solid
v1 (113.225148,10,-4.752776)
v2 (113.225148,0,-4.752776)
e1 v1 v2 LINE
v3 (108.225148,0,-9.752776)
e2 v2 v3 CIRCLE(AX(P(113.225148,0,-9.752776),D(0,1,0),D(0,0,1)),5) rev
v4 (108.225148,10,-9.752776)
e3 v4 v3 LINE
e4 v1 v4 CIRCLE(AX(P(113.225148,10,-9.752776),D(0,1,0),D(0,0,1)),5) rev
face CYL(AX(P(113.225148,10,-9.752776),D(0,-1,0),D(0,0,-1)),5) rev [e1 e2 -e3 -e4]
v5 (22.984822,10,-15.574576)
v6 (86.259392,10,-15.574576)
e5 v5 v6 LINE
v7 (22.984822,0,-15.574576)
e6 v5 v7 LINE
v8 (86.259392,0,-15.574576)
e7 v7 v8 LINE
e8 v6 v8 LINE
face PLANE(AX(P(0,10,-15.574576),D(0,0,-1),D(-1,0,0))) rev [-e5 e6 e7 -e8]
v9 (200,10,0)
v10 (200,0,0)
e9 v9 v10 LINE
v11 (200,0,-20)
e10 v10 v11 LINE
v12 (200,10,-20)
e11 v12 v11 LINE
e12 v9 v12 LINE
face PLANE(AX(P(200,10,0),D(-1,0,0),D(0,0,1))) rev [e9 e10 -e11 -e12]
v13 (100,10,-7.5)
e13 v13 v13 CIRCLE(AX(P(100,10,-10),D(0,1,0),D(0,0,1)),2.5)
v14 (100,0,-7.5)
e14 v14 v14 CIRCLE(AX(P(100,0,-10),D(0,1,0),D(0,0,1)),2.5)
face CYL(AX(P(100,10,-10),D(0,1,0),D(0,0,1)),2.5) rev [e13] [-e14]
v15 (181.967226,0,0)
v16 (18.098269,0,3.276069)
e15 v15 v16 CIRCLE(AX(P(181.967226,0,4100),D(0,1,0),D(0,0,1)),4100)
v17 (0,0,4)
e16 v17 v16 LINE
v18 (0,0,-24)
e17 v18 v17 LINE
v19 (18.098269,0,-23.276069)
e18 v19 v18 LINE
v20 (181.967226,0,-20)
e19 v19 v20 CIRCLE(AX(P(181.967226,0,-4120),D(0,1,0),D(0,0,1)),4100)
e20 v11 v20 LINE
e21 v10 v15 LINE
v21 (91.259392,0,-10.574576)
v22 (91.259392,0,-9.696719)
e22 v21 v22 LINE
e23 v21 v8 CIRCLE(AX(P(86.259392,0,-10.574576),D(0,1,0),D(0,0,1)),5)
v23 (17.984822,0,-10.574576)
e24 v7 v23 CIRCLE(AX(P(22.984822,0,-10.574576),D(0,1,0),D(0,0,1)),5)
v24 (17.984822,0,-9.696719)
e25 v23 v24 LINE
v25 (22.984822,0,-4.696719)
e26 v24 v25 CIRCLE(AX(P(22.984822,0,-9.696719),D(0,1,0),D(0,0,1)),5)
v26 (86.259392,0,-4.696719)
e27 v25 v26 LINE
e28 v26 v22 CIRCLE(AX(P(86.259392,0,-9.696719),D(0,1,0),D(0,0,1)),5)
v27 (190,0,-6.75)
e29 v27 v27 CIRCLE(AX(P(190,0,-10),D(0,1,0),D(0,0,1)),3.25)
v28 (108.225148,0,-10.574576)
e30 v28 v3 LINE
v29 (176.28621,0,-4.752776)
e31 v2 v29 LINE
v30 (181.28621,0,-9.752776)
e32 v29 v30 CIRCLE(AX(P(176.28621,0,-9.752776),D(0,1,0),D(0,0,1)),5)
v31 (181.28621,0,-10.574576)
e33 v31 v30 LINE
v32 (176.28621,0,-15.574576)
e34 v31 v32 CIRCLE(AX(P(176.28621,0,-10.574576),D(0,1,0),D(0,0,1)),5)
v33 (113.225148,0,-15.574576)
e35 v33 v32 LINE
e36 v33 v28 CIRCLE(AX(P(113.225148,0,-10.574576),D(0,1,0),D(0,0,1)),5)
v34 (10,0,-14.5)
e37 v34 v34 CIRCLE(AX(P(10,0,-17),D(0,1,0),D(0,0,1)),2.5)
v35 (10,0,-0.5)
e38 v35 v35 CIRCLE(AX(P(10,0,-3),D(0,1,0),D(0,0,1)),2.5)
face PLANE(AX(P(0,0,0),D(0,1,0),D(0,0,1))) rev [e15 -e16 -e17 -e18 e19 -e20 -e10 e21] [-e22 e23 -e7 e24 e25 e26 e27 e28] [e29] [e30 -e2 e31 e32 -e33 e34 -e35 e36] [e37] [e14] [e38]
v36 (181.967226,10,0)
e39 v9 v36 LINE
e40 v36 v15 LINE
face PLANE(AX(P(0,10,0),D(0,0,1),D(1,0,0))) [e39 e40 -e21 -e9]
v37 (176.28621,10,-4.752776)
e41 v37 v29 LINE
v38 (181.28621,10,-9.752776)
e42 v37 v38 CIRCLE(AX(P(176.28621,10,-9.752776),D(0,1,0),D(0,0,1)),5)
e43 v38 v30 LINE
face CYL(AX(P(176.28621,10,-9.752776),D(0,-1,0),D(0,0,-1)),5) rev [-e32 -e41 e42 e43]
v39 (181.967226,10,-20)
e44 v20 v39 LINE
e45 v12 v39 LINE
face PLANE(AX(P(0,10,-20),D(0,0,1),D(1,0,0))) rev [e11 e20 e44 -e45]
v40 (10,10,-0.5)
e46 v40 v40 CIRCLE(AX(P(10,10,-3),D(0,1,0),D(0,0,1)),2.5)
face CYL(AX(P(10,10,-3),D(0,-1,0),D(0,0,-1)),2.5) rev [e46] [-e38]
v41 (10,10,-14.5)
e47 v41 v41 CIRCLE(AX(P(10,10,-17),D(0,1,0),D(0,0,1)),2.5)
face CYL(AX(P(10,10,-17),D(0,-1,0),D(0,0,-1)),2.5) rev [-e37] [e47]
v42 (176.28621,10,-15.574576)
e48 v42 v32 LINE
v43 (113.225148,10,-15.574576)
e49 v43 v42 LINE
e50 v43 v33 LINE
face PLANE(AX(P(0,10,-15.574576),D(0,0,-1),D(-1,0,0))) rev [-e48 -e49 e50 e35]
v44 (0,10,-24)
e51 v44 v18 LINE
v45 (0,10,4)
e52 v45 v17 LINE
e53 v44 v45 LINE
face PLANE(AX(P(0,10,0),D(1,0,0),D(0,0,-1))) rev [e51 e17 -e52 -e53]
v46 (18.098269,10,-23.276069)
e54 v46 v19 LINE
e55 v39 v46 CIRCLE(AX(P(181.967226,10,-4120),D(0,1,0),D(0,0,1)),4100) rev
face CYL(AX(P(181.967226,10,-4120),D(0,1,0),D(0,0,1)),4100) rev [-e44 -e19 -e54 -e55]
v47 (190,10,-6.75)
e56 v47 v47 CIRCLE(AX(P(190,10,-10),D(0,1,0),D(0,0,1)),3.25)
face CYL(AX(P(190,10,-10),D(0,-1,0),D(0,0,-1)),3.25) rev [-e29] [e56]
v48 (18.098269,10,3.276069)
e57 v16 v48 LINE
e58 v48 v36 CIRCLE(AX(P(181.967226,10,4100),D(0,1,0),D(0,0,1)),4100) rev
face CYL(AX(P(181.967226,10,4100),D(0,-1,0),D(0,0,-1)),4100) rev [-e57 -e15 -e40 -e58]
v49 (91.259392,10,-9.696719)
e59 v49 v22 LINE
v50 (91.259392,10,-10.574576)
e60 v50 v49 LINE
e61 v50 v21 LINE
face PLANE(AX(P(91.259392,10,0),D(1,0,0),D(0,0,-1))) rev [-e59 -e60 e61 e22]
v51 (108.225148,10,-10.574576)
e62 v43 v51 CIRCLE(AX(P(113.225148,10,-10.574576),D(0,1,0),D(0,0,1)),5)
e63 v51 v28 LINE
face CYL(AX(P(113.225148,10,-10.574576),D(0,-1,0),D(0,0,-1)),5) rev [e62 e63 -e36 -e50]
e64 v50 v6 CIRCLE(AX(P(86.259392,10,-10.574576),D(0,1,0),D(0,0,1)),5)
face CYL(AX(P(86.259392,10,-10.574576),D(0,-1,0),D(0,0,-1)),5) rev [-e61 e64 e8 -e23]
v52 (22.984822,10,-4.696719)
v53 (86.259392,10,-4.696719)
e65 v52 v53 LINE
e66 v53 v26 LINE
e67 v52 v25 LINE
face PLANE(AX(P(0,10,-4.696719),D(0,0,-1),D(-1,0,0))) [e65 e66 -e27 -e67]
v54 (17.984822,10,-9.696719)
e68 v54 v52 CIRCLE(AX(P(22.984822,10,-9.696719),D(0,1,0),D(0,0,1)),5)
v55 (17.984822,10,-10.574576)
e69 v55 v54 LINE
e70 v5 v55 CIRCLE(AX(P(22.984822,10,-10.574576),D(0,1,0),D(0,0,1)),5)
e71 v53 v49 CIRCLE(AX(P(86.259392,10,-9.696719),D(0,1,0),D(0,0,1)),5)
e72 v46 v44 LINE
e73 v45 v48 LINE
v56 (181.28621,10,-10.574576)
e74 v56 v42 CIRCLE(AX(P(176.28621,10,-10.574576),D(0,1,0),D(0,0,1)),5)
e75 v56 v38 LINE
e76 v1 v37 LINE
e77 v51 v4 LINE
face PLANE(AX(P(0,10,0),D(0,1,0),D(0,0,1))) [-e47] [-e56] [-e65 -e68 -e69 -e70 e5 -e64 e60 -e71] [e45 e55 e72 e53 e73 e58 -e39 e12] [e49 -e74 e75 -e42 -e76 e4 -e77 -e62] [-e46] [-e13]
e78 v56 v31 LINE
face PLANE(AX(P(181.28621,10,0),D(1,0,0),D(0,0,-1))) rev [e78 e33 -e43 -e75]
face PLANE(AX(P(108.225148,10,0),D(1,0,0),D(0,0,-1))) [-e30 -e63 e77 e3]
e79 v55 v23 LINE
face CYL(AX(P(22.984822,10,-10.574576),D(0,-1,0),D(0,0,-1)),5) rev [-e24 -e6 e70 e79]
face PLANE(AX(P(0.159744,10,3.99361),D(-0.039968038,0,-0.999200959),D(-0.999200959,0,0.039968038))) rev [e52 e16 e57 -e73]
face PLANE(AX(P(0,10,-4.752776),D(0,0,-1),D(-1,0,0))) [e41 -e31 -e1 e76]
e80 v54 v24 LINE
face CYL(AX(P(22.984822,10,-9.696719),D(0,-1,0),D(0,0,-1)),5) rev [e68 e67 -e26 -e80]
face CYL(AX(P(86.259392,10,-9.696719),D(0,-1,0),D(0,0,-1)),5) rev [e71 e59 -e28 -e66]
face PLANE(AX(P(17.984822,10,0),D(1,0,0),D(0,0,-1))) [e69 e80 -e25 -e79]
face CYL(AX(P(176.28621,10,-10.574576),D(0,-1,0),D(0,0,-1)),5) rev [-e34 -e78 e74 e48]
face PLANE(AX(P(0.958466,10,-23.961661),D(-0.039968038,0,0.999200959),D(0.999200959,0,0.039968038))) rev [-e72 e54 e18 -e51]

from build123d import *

# Parameters (mm, degrees)
SZKIC1_R                    = 1.97098021
SZKIC1_R_2                  = 3.25
SZKIC1_R_3                  = 2.5
DODANIE_WYCI_GNI_CIE1_DEPTH = 10
ZAOKR_GLENIE1_R             = 4100
OTW_R_GWINTOWANY_M62_D      = 5
OTW_R_GWINTOWANY_M62_DEPTH  = 15.497848452
OTW_R_GWINTOWANY_M62_TIP    = 1.502151548


with BuildPart() as part:
    # Szkic1 → Dodanie-wyciągnięcie1 (new body)
    with BuildSketch(Plane(origin=(0, 0, 0), x_dir=(1, 0, 0), z_dir=(0, 1, 0))):
        Polygon((200, 0), (200, 20), (100, 20), (0, 24), (0, -4), (100, 0), align=None)
        with Locations(Location((100, 10, 0), (0, 0, 270))):
            Circle(SZKIC1_R, mode=Mode.SUBTRACT)
        with Locations(Location((190, 10, 0), (0, 0, 270))):
            Circle(SZKIC1_R_2, mode=Mode.SUBTRACT)
        with Locations(Location((10, 17, 0), (0, 0, 270))):
            Circle(SZKIC1_R_3, mode=Mode.SUBTRACT)
        with Locations(Location((10, 3, 0), (0, 0, 270))):
            Circle(SZKIC1_R_3, mode=Mode.SUBTRACT)
        with BuildLine():
            Line((22.984822323, 15.57457628), (86.25939238, 15.57457628))
            ThreePointArc((86.25939238, 15.57457628), (89.794926286, 14.110110186), (91.25939238, 10.57457628))
            Line((91.25939238, 10.57457628), (91.25939238, 9.696719379))
            ThreePointArc((91.25939238, 9.696719379), (89.794926286, 6.161185473), (86.25939238, 4.696719379))
            Line((86.25939238, 4.696719379), (22.984822323, 4.696719379))
            ThreePointArc((22.984822323, 4.696719379), (19.449288417, 6.161185473), (17.984822323, 9.696719379))
            Line((17.984822323, 9.696719379), (17.984822323, 10.57457628))
            ThreePointArc((17.984822323, 10.57457628), (19.449288417, 14.110110186), (22.984822323, 15.57457628))
        make_face(mode=Mode.SUBTRACT)
        with BuildLine():
            Line((113.225148066, 15.57457628), (176.286209663, 15.57457628))
            ThreePointArc((176.286209663, 15.57457628), (179.821743569, 14.110110186), (181.286209663, 10.57457628))
            Line((181.286209663, 10.57457628), (181.286209663, 9.752776346))
            ThreePointArc((181.286209663, 9.752776346), (179.821743569, 6.21724244), (176.286209663, 4.752776346))
            Line((176.286209663, 4.752776346), (113.225148066, 4.752776346))
            ThreePointArc((113.225148066, 4.752776346), (109.68961416, 6.21724244), (108.225148066, 9.752776346))
            Line((108.225148066, 9.752776346), (108.225148066, 10.57457628))
            ThreePointArc((108.225148066, 10.57457628), (109.68961416, 14.110110186), (113.225148066, 15.57457628))
        make_face(mode=Mode.SUBTRACT)
    extrude(amount=DODANIE_WYCI_GNI_CIE1_DEPTH)

    # Zaokrąglenie1
    # the kernel refuses this fillet: 4100 mm, written as the material it adds along each edge
    with BuildSketch(Plane(origin=(100, 0, -20), x_dir=(1, 0, 0), z_dir=(0, 1, 0)), Plane(origin=(100, 0, 0), x_dir=(-0.9992009587217893, 0, 0.03996803834887583), z_dir=(0, 1, 0))) as zaokr_glenie1_piece_1:
        with BuildLine():
            CenterArc((ZAOKR_GLENIE1_R * 0.0199920063936, ZAOKR_GLENIE1_R), ZAOKR_GLENIE1_R, 267.709389957, 2.290610043)
            Line((-ZAOKR_GLENIE1_R * 0.0199760319553, ZAOKR_GLENIE1_R * 0.000799041278211), (0, 0))
            Line((0, 0), (ZAOKR_GLENIE1_R * 0.0199920063936, 0))
        make_face()
    extrude(amount=10)

    # Otwór gwintowany M62
    with Locations(Plane(origin=(100, 10, -10), x_dir=(0, 0, 1), z_dir=(0, 1, 0))):
        with Locations((0, 0)):
            Hole(OTW_R_GWINTOWANY_M62_D / 2, depth=OTW_R_GWINTOWANY_M62_DEPTH)
            with Locations((0, 0, -(OTW_R_GWINTOWANY_M62_DEPTH + OTW_R_GWINTOWANY_M62_TIP / 2))):  # 118° drill point
                Cone(0, OTW_R_GWINTOWANY_M62_D / 2, OTW_R_GWINTOWANY_M62_TIP, mode=Mode.SUBTRACT)


solid = part.part
